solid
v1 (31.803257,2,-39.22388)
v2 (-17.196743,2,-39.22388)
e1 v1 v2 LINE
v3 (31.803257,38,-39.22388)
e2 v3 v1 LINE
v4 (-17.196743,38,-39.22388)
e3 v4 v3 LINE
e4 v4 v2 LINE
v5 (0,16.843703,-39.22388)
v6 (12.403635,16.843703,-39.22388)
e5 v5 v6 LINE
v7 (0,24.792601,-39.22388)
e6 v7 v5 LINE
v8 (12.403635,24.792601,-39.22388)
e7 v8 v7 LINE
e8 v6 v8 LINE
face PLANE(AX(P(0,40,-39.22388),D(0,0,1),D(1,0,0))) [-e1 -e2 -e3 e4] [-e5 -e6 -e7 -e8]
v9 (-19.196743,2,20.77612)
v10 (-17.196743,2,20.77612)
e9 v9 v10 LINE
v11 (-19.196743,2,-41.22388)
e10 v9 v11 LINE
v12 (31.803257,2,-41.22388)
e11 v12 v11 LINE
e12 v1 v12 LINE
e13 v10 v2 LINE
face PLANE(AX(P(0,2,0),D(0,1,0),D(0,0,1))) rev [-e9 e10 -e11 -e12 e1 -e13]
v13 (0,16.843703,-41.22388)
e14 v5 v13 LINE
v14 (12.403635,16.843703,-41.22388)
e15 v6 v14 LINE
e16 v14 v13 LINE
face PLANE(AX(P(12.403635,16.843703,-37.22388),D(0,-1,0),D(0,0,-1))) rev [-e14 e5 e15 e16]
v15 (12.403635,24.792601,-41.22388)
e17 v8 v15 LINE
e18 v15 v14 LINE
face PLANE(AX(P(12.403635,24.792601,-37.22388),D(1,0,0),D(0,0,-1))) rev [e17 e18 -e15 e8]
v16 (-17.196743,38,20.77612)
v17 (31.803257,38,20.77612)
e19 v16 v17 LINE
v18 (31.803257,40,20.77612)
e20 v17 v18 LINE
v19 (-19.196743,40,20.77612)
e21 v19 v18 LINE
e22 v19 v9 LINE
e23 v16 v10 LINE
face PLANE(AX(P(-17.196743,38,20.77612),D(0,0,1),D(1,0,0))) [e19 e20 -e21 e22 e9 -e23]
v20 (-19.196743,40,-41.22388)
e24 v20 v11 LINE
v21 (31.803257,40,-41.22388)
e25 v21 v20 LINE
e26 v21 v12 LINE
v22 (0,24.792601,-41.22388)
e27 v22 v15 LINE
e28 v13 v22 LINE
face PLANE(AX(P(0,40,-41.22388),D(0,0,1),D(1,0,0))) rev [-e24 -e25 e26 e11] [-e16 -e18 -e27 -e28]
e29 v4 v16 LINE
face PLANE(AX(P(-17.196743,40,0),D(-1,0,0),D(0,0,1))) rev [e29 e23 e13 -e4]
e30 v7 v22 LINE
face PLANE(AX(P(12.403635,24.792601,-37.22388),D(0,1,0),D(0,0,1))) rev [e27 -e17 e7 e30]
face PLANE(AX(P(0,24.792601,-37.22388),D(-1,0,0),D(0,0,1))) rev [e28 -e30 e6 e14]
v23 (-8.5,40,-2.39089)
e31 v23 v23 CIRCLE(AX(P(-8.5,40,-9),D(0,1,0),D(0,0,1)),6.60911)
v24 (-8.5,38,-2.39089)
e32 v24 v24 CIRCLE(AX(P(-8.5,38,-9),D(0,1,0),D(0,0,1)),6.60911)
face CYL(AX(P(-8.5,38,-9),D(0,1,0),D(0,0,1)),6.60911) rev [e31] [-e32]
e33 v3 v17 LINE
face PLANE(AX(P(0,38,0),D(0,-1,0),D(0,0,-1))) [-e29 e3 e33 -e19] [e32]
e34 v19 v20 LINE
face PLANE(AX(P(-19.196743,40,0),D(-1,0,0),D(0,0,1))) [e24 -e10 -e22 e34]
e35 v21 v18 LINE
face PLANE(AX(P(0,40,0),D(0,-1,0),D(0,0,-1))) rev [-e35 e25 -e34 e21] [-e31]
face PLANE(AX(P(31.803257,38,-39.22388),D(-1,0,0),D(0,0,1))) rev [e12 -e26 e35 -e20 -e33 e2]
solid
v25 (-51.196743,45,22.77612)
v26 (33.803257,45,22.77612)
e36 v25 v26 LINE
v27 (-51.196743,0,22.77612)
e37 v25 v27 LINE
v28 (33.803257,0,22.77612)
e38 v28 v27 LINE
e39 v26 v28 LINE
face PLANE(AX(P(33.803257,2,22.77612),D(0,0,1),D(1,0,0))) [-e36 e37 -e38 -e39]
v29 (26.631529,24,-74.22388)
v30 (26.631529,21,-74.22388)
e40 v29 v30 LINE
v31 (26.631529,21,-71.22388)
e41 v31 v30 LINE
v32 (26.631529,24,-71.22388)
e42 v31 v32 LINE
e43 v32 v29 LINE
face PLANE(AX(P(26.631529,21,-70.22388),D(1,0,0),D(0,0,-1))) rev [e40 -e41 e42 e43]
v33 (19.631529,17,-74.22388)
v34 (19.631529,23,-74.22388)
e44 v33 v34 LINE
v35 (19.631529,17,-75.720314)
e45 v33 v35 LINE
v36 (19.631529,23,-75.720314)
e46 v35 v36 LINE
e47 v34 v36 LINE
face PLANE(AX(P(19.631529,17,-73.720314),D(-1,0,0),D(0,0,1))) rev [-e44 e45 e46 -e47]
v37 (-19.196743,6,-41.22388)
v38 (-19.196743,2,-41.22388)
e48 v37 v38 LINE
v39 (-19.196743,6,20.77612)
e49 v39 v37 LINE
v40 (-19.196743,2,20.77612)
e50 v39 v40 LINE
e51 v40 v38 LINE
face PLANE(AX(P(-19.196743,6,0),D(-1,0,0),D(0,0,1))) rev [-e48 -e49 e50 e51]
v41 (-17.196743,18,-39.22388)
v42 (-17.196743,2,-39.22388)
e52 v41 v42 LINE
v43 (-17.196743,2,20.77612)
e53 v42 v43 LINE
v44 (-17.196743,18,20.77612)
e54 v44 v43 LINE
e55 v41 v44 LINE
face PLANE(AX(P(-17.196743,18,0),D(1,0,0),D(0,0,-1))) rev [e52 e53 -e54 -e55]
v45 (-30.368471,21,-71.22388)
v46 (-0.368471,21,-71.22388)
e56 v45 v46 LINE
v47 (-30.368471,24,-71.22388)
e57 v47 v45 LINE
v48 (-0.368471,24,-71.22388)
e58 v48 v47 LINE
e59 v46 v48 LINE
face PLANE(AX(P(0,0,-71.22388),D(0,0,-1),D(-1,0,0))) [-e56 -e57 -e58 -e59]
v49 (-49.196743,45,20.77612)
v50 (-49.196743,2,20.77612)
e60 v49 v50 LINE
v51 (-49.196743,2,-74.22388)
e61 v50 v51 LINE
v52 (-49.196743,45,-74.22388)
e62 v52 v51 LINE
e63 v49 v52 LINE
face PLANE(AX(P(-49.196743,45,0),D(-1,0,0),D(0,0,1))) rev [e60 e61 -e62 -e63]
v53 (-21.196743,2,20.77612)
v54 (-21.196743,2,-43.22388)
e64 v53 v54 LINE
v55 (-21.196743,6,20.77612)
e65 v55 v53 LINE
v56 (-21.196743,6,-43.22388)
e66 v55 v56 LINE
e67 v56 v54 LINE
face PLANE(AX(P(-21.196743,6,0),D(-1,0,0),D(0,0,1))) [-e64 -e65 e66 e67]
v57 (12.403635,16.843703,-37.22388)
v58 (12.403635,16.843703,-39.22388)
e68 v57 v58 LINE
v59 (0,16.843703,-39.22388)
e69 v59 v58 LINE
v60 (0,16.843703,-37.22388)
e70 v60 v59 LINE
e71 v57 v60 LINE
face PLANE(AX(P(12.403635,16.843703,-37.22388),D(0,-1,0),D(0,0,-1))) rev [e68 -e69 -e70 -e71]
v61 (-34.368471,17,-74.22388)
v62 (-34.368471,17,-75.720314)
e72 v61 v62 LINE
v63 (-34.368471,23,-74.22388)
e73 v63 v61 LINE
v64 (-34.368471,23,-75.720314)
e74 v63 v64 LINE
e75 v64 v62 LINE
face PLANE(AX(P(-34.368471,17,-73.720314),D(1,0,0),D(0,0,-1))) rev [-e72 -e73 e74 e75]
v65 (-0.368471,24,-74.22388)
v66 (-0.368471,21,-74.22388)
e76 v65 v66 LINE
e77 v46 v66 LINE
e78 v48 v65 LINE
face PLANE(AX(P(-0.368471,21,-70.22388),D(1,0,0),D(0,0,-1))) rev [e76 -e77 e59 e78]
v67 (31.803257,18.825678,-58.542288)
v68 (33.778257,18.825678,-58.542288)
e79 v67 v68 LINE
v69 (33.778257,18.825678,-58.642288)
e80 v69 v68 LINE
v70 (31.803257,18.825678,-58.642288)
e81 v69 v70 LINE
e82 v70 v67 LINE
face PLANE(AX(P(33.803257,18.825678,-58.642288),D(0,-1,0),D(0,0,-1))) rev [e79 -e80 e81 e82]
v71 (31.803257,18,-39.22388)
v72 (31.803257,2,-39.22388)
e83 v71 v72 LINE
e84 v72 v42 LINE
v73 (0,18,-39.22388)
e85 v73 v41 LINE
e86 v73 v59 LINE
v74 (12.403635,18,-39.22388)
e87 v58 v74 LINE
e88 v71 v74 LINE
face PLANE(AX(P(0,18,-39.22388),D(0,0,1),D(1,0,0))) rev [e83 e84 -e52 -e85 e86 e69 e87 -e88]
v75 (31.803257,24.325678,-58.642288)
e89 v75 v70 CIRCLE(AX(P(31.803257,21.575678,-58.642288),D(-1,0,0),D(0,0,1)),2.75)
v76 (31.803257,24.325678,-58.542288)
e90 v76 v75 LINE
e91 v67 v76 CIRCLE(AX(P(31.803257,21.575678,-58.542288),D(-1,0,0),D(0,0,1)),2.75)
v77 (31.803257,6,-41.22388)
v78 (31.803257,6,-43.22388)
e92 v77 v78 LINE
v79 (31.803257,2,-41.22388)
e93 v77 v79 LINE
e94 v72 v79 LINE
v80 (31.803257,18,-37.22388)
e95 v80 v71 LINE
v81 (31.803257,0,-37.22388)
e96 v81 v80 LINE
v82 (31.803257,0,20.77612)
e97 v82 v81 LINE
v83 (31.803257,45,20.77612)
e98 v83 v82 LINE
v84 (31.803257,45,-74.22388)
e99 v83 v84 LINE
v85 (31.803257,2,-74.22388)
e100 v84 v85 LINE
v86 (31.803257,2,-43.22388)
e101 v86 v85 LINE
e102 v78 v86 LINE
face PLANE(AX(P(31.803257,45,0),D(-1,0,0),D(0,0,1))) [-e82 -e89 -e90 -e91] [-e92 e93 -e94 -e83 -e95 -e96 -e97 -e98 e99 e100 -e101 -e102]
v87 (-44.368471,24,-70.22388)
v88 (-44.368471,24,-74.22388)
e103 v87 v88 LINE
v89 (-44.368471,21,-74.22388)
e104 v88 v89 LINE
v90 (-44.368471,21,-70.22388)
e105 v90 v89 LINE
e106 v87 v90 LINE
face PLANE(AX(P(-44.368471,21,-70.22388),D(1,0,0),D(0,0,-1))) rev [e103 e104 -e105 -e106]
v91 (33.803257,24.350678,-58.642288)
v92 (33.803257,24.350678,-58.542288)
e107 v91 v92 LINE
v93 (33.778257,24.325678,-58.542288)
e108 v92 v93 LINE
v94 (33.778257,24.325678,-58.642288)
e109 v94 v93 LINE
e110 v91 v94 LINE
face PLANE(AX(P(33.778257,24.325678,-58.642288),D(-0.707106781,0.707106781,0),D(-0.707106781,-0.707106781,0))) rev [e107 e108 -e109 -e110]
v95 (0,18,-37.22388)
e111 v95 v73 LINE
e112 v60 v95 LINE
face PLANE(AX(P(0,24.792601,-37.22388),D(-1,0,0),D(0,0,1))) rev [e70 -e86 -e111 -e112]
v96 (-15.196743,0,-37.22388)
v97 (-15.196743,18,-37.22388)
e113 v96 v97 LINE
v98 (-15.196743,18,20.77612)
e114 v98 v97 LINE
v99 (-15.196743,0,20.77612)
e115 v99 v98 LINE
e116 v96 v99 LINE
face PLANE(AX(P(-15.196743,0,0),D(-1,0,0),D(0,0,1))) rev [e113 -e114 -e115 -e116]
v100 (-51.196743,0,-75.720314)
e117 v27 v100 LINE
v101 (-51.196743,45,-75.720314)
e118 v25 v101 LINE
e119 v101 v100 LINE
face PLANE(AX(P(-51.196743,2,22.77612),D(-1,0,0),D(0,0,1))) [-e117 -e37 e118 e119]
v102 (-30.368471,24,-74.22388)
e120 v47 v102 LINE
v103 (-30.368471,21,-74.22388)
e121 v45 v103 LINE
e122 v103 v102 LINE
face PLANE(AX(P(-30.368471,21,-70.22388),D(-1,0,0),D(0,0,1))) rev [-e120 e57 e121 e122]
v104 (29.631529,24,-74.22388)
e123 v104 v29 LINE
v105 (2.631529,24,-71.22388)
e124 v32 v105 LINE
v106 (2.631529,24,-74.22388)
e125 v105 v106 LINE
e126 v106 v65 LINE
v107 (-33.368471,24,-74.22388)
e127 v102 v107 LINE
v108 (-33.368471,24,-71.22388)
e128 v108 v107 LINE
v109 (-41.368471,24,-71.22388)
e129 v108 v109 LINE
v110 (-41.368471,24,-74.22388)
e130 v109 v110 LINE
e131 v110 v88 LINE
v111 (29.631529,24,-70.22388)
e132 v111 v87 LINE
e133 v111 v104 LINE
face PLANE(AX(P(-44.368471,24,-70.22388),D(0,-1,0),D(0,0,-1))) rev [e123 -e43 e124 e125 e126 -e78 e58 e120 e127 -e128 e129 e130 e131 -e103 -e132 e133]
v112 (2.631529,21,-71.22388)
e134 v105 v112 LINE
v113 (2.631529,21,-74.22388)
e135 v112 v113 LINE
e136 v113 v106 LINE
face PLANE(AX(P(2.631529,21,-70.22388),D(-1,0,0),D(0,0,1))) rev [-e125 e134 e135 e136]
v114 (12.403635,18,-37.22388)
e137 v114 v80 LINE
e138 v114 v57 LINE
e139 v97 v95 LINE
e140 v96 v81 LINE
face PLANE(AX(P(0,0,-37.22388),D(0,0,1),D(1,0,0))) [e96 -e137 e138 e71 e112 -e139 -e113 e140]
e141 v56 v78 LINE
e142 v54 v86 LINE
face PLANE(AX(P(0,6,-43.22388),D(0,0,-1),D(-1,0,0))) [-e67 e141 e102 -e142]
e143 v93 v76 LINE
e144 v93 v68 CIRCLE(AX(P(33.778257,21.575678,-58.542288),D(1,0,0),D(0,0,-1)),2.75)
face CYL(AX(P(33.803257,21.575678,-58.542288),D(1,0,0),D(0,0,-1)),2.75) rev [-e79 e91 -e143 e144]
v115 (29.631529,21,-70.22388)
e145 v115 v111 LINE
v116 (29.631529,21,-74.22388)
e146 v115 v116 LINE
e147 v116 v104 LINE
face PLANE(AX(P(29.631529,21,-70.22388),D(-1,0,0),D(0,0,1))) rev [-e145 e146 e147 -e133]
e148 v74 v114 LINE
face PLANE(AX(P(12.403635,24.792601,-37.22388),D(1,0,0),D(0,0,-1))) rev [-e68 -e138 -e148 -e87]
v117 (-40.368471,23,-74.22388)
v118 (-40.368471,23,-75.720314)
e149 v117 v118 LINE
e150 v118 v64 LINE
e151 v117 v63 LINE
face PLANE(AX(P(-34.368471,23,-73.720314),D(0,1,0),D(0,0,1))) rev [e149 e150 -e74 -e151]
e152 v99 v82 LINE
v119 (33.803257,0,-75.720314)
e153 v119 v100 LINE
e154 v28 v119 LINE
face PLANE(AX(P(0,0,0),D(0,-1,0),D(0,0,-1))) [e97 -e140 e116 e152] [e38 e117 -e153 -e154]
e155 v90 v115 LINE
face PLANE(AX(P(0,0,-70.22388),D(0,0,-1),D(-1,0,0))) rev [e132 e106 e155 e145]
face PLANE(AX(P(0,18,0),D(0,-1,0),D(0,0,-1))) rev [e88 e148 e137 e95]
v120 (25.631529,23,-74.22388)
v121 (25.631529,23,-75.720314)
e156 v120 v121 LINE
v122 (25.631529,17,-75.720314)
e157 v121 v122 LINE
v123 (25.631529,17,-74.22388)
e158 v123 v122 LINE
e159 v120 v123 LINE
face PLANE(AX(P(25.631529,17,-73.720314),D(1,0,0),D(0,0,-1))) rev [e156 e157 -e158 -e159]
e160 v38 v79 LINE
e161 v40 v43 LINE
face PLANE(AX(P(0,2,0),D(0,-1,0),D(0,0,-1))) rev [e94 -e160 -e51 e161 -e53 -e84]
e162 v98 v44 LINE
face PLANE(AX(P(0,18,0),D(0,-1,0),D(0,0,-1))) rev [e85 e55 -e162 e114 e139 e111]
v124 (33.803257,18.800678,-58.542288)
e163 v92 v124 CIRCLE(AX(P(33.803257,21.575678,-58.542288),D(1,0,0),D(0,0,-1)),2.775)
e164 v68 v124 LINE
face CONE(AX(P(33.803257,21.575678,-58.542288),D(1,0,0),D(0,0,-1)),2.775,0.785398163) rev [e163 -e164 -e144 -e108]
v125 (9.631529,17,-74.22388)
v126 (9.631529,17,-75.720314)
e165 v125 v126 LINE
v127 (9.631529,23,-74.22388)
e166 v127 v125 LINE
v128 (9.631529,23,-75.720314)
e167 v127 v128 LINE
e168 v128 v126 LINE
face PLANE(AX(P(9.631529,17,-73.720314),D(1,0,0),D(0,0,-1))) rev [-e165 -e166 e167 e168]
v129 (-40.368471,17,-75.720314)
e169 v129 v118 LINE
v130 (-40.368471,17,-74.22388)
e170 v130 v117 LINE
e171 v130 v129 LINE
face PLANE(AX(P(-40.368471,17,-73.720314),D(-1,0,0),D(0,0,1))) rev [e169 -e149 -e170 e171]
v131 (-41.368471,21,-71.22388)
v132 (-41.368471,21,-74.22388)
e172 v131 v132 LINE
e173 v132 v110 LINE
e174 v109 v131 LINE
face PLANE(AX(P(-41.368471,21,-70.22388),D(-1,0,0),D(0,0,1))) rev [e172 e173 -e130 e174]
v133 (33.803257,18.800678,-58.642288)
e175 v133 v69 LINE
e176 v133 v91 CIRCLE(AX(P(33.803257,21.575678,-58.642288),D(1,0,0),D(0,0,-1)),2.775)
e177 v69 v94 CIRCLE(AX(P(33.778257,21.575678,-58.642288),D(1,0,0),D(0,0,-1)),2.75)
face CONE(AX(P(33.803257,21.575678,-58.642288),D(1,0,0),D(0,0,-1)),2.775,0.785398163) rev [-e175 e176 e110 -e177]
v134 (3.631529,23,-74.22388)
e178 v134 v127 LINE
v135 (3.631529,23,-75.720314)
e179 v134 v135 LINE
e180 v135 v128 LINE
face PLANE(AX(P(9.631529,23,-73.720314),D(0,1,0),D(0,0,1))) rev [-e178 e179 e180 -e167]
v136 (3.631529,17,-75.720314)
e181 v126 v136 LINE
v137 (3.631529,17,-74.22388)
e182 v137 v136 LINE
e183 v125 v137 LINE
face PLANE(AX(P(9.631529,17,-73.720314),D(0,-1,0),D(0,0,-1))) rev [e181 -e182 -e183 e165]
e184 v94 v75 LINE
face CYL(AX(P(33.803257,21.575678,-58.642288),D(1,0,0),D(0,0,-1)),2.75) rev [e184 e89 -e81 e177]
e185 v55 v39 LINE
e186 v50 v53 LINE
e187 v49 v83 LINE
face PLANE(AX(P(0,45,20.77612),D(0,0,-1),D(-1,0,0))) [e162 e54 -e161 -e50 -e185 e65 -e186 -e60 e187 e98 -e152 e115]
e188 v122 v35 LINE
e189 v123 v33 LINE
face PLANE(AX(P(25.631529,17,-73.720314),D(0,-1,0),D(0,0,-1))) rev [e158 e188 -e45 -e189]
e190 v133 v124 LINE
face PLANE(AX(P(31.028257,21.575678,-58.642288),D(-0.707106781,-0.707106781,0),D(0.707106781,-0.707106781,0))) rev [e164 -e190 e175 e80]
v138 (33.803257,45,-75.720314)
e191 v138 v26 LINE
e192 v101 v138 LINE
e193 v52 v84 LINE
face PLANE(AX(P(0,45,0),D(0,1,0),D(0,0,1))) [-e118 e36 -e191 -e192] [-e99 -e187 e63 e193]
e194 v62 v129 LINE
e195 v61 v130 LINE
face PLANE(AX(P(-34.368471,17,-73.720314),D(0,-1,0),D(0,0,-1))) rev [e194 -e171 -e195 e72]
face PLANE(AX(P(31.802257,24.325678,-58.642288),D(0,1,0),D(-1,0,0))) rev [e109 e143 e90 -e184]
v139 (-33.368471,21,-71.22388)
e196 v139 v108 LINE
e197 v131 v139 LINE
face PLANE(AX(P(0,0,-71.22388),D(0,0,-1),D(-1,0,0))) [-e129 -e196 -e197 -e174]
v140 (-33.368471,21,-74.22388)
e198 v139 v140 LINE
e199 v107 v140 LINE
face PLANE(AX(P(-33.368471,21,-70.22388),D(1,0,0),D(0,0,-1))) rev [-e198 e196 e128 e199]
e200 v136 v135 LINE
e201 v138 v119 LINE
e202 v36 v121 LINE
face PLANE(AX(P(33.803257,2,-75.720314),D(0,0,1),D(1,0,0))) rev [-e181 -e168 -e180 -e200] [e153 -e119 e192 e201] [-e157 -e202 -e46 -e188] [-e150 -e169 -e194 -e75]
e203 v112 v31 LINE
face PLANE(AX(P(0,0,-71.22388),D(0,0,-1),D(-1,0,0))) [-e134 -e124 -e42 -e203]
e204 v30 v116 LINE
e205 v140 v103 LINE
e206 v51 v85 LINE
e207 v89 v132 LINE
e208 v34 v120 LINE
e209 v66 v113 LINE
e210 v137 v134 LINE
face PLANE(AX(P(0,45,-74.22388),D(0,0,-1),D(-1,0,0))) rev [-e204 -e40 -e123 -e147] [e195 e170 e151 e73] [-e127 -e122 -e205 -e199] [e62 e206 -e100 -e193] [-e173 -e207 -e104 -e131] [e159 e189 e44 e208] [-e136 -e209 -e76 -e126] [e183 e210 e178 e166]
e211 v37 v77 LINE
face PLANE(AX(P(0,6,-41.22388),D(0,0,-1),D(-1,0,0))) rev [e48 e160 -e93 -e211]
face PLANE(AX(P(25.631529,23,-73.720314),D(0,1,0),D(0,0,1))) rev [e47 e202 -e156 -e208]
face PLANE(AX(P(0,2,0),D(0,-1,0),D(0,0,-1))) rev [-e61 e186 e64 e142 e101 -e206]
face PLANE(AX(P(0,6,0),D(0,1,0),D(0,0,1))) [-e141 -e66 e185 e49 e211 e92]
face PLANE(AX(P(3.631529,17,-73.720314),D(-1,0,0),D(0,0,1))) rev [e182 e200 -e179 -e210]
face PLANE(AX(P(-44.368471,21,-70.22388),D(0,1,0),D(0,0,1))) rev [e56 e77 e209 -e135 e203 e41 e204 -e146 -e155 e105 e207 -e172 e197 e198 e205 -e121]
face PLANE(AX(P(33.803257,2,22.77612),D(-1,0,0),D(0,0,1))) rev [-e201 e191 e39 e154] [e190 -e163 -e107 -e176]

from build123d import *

# Parameters (mm, degrees)
SKETCH_1_W                     = 85
SKETCH_1_H                     = 98.49643328
EXTRUDE_1_DEPTH                = 2
SKETCH_1_6_W                   = 2
SKETCH_1_6_H                   = 95
EXTRUDE_2_DEPTH                = 45
SKETCH_1_7_W                   = 54
SKETCH_1_7_H                   = 2
BOSS_EXTRUDE1_DEPTH            = 1
SKETCH13_W                     = 6
SKETCH13_H                     = 6
CUT_EXTRUDE3_DEPTH             = 2
SKETCH15_W                     = 3
SKETCH15_H                     = 3
BOSS_EXTRUDE4_DEPTH            = 4
SKETCH16_W                     = 74
SKETCH16_H                     = 3
BOSS_EXTRUDE6_DEPTH            = 1
SKETCH17_W                     = 47
SKETCH17_H                     = 58
CUT_EXTRUDE4_DEPTH             = 2
BOSS_EXTRUDE7_DEPTH            = 18
SKETCH20_W                     = 2
SKETCH20_H                     = 60
BOSS_EXTRUDE8_DEPTH            = 38
SKETCH22_W                     = 49
SKETCH22_H                     = 60
SKETCH22_R                     = 6.609110004
BOSS_EXTRUDE10_DEPTH           = 2
SKETCH23_W                     = 51
SKETCH23_H                     = 2
BOSS_EXTRUDE11_DEPTH           = 4
SKETCH24_W                     = 12.403634637
SKETCH24_H                     = 7.948897958
CUT_EXTRUDE5_DEPTH             = 4
F_5_5_START                    = 31
F_5_5_5_5_DIAMETER_HOLE2_DEPTH = 4


with BuildPart() as part:
    # ｽｹｯﾁ1 → ﾎﾞｽ - 押し出し1 (new body)
    with BuildSketch(Plane(origin=(0, 0, 0), x_dir=(1, 0, 0), z_dir=(0, 1, 0))):
        with Locations((-8.696743418, 26.472097138)):
            Rectangle(SKETCH_1_W, SKETCH_1_H)
    extrude(amount=EXTRUDE_1_DEPTH)

    # ｽｹｯﾁ1<6> → ﾎﾞｽ - 押し出し2 (add)
    with BuildSketch(Plane(origin=(0, 0, 0), x_dir=(1, 0, 0), z_dir=(0, 1, 0))):
        with Locations((-50.196743418, 26.723880498)):
            Rectangle(SKETCH_1_6_W, SKETCH_1_6_H)
        Polygon((33.803256582, -20.776119502), (31.803256582, -20.776119502), (-22.196743418, -20.776119502), (-24.196743418, -20.776119502), (-49.196743418, -20.776119502), (-51.196743418, -20.776119502), (-51.196743418, -22.776119502), (33.803256582, -22.776119502), align=None)
        Polygon((-22.196743418, 74.223880498), (31.803256582, 74.223880498), (31.803256582, 75.720313778), (-51.196743418, 75.720313778), (-51.196743418, 74.223880498), (-49.196743418, 74.223880498), (-24.196743418, 74.223880498), align=None)
        Polygon((31.803256582, 50.223880498), (31.803256582, 48.223880498), (31.803256582, -20.776119502), (33.803256582, -20.776119502), (33.803256582, 75.720313778), (31.803256582, 75.720313778), (31.803256582, 74.223880498), align=None)
    extrude(amount=EXTRUDE_2_DEPTH)

    # ｽｹｯﾁ1<7> → Boss-Extrude1 (add)
    with BuildSketch(Plane(origin=(0, 0, 0), x_dir=(1, 0, 0), z_dir=(0, 1, 0))):
        with Locations((4.803256582, 49.223880498)):
            Rectangle(SKETCH_1_7_W, SKETCH_1_7_H)
        Polygon((-22.196743418, -20.776119502), (-22.196743418, 48.223880498), (-22.196743418, 50.223880498), (-22.196743418, 74.223880498), (-24.196743418, 74.223880498), (-24.196743418, -20.776119502), align=None)
    extrude(amount=BOSS_EXTRUDE1_DEPTH)

    # Sketch13 → Cut-Extrude3 (cut)
    with BuildSketch(Plane(origin=(0, 0, -75.720313778), x_dir=(-1, 0, 0), z_dir=(0, 0, -1))):
        with Locations((-6.631529016, 20)):
            Rectangle(SKETCH13_W, SKETCH13_H)
        with Locations((-22.631529016, 20)):
            Rectangle(SKETCH13_W, SKETCH13_H)
        with Locations((37.368470984, 20)):
            Rectangle(SKETCH13_W, SKETCH13_H)
    extrude(amount=-CUT_EXTRUDE3_DEPTH, mode=Mode.SUBTRACT)

    # Sketch15 → Boss-Extrude4 (add)
    with BuildSketch(Plane.XY.offset(-74.223880498)):
        with Locations((-42.868470984, 22.5)):
            Rectangle(SKETCH15_W, SKETCH15_H)
        with Locations((28.131529016, 22.5)):
            Rectangle(SKETCH15_W, SKETCH15_H)
        with Locations((-31.868470984, 22.5)):
            Rectangle(SKETCH15_W, SKETCH15_H)
        with Locations((1.131529016, 22.5)):
            Rectangle(SKETCH15_W, SKETCH15_H)
    extrude(amount=BOSS_EXTRUDE4_DEPTH)

    # Sketch16 → Boss-Extrude6 (add)
    with BuildSketch(Plane.XY.offset(-70.223880498)):
        with Locations((-7.368470984, 22.5)):
            Rectangle(SKETCH16_W, SKETCH16_H)
    extrude(amount=-BOSS_EXTRUDE6_DEPTH)

    # Sketch17 → Cut-Extrude4 (cut)
    with BuildSketch(Plane(origin=(0, 2, 0), x_dir=(1, 0, 0), z_dir=(0, 1, 0))):
        with Locations((8.303256582, 8.223880498)):
            Rectangle(SKETCH17_W, SKETCH17_H)
    extrude(amount=-CUT_EXTRUDE4_DEPTH, mode=Mode.SUBTRACT)

    # Sketch19 → Boss-Extrude7 (add)
    with BuildSketch(Plane.XZ):
        Polygon((31.803256582, -37.223880498), (-15.196743418, -37.223880498), (-15.196743418, 20.776119502), (-17.196743418, 20.776119502), (-17.196743418, -39.223880498), (31.803256582, -39.223880498), align=None)
    extrude(amount=-BOSS_EXTRUDE7_DEPTH)


with BuildPart() as body_2:
    # Sketch20 → Boss-Extrude8 (new body)
    with BuildSketch(Plane(origin=(0, 2, 0), x_dir=(1, 0, 0), z_dir=(0, 1, 0))):
        Polygon((-19.196743418, 39.223880498), (-17.196743418, 39.223880498), (31.803256582, 39.223880498), (31.803256582, 41.223880498), (-19.196743418, 41.223880498), align=None)
        with Locations((-18.196743418, 9.223880498)):
            Rectangle(SKETCH20_W, SKETCH20_H)
    extrude(amount=BOSS_EXTRUDE8_DEPTH)


with BuildPart() as body_3:
    # Sketch22 → Boss-Extrude10 (new body)
    with BuildSketch(Plane(origin=(0, 40, 0), x_dir=(1, 0, 0), z_dir=(0, 1, 0))):
        with Locations((7.303256582, 9.223880498)):
            Rectangle(SKETCH22_W, SKETCH22_H)
        with Locations(Location((-8.5, 9, 0), (0, 0, 270))):
            Circle(SKETCH22_R, mode=Mode.SUBTRACT)
    extrude(amount=-BOSS_EXTRUDE10_DEPTH)

    # Combine1: union body 2
    add(body_2.part)


with BuildPart() as body_3_2:
    # Sketch23 → Boss-Extrude11 (new body)
    with BuildSketch(Plane(origin=(0, 2, 0), x_dir=(1, 0, 0), z_dir=(0, 1, 0))):
        with Locations((6.303256582, 42.223880498)):
            Rectangle(SKETCH23_W, SKETCH23_H)
        Polygon((-21.196743418, -20.776119502), (-19.196743418, -20.776119502), (-19.196743418, 41.223880498), (-19.196743418, 43.223880498), (-21.196743418, 43.223880498), align=None)
    extrude(amount=BOSS_EXTRUDE11_DEPTH)

    # Combine2: union part
    add(part.part)


with BuildPart() as cut_extrude5_tool:
    # Sketch24 → Cut-Extrude5 (new body)
    with BuildSketch(Plane(origin=(0, 0, -41.223880498), x_dir=(-1, 0, 0), z_dir=(0, 0, -1))):
        with Locations((-6.201817319, 20.818151846)):
            Rectangle(SKETCH24_W, SKETCH24_H)
    extrude(amount=-CUT_EXTRUDE5_DEPTH)


with BuildPart() as body_3_1:
    add(body_3.part)

    # Cut-Extrude5: cut by cut_extrude5_tool
    add(cut_extrude5_tool.part, mode=Mode.SUBTRACT)


with BuildPart() as body_3_2_1:
    add(body_3_2.part)

    # Cut-Extrude5: cut by cut_extrude5_tool
    add(cut_extrude5_tool.part, mode=Mode.SUBTRACT)

    # Ø5.5 (5.5) Diameter Hole2: read off the stored shape, not the designer's step
    # Ø5.5 (5.5) Diameter Hole2 outline → Ø5.5 (5.5) Diameter Hole2 (cut)
    with BuildSketch(Plane.YZ.offset(F_5_5_START)):
        with BuildLine():
            Line((24.325677948, -58.642288451), (24.325677948, -58.542288451))
            ThreePointArc((24.325677948, -58.542288451), (21.575677948, -55.792288451), (18.825677948, -58.542288451))
            Line((18.825677948, -58.542288451), (18.825677948, -58.642288451))
            ThreePointArc((18.825677948, -58.642288451), (21.575677948, -61.392288451), (24.325677948, -58.642288451))
        make_face()
    extrude(amount=F_5_5_5_5_DIAMETER_HOLE2_DEPTH, mode=Mode.SUBTRACT)

    # 5.5 _5.5_ Diameter Hole2 2: loft between two sections, ruled curve by curve
    f_5_5_5_5_diameter_hole2_2_from = [
        Edge.make_three_point_arc((33.778256582, 24.325677948, -58.542288451), (33.778256582, 23.520221596, -56.597744802), (33.778256582, 21.575677948, -55.792288451)),
        Edge.make_three_point_arc((33.778256582, 21.575677948, -55.792288451), (33.778256582, 19.6311343, -56.597744802), (33.778256582, 18.825677948, -58.542288451)),
        Edge.make_three_point_arc((33.778256582, 18.825677948, -58.642288451), (33.778256582, 19.6311343, -60.586832099), (33.778256582, 21.575677948, -61.392288451)),
        Edge.make_three_point_arc((33.778256582, 21.575677948, -61.392288451), (33.778256582, 23.520221596, -60.586832099), (33.778256582, 24.325677948, -58.642288451)),
        Edge.make_line((33.778256582, 18.825677948, -58.542288451), (33.778256582, 18.825677948, -58.642288451)),
        Edge.make_line((33.778256582, 24.325677948, -58.542288451), (33.778256582, 24.325677948, -58.642288451)),
    ]
    f_5_5_5_5_diameter_hole2_2_to = [
        Edge.make_three_point_arc((33.803256582, 24.350677948, -58.542288451), (33.803256582, 23.537899266, -56.580067133), (33.803256582, 21.575677948, -55.767288451)),
        Edge.make_three_point_arc((33.803256582, 21.575677948, -55.767288451), (33.803256582, 19.61345663, -56.580067133), (33.803256582, 18.800677948, -58.542288451)),
        Edge.make_three_point_arc((33.803256582, 18.800677948, -58.642288451), (33.803256582, 19.61345663, -60.604509769), (33.803256582, 21.575677948, -61.417288451)),
        Edge.make_three_point_arc((33.803256582, 21.575677948, -61.417288451), (33.803256582, 23.537899266, -60.604509769), (33.803256582, 24.350677948, -58.642288451)),
        Edge.make_line((33.803256582, 18.800677948, -58.542288451), (33.803256582, 18.800677948, -58.642288451)),
        Edge.make_line((33.803256582, 24.350677948, -58.542288451), (33.803256582, 24.350677948, -58.642288451)),
    ]
    f_5_5_5_5_diameter_hole2_2 = Solid(Shell([*[Face.make_surface_from_curves(f_5_5_5_5_diameter_hole2_2_from[k], f_5_5_5_5_diameter_hole2_2_to[k]) for k in range(6)], Face(Wire(f_5_5_5_5_diameter_hole2_2_from)), Face(Wire(f_5_5_5_5_diameter_hole2_2_to))]))
    add(f_5_5_5_5_diameter_hole2_2, mode=Mode.SUBTRACT)


solid = Compound([body_3_1.part, body_3_2_1.part])
